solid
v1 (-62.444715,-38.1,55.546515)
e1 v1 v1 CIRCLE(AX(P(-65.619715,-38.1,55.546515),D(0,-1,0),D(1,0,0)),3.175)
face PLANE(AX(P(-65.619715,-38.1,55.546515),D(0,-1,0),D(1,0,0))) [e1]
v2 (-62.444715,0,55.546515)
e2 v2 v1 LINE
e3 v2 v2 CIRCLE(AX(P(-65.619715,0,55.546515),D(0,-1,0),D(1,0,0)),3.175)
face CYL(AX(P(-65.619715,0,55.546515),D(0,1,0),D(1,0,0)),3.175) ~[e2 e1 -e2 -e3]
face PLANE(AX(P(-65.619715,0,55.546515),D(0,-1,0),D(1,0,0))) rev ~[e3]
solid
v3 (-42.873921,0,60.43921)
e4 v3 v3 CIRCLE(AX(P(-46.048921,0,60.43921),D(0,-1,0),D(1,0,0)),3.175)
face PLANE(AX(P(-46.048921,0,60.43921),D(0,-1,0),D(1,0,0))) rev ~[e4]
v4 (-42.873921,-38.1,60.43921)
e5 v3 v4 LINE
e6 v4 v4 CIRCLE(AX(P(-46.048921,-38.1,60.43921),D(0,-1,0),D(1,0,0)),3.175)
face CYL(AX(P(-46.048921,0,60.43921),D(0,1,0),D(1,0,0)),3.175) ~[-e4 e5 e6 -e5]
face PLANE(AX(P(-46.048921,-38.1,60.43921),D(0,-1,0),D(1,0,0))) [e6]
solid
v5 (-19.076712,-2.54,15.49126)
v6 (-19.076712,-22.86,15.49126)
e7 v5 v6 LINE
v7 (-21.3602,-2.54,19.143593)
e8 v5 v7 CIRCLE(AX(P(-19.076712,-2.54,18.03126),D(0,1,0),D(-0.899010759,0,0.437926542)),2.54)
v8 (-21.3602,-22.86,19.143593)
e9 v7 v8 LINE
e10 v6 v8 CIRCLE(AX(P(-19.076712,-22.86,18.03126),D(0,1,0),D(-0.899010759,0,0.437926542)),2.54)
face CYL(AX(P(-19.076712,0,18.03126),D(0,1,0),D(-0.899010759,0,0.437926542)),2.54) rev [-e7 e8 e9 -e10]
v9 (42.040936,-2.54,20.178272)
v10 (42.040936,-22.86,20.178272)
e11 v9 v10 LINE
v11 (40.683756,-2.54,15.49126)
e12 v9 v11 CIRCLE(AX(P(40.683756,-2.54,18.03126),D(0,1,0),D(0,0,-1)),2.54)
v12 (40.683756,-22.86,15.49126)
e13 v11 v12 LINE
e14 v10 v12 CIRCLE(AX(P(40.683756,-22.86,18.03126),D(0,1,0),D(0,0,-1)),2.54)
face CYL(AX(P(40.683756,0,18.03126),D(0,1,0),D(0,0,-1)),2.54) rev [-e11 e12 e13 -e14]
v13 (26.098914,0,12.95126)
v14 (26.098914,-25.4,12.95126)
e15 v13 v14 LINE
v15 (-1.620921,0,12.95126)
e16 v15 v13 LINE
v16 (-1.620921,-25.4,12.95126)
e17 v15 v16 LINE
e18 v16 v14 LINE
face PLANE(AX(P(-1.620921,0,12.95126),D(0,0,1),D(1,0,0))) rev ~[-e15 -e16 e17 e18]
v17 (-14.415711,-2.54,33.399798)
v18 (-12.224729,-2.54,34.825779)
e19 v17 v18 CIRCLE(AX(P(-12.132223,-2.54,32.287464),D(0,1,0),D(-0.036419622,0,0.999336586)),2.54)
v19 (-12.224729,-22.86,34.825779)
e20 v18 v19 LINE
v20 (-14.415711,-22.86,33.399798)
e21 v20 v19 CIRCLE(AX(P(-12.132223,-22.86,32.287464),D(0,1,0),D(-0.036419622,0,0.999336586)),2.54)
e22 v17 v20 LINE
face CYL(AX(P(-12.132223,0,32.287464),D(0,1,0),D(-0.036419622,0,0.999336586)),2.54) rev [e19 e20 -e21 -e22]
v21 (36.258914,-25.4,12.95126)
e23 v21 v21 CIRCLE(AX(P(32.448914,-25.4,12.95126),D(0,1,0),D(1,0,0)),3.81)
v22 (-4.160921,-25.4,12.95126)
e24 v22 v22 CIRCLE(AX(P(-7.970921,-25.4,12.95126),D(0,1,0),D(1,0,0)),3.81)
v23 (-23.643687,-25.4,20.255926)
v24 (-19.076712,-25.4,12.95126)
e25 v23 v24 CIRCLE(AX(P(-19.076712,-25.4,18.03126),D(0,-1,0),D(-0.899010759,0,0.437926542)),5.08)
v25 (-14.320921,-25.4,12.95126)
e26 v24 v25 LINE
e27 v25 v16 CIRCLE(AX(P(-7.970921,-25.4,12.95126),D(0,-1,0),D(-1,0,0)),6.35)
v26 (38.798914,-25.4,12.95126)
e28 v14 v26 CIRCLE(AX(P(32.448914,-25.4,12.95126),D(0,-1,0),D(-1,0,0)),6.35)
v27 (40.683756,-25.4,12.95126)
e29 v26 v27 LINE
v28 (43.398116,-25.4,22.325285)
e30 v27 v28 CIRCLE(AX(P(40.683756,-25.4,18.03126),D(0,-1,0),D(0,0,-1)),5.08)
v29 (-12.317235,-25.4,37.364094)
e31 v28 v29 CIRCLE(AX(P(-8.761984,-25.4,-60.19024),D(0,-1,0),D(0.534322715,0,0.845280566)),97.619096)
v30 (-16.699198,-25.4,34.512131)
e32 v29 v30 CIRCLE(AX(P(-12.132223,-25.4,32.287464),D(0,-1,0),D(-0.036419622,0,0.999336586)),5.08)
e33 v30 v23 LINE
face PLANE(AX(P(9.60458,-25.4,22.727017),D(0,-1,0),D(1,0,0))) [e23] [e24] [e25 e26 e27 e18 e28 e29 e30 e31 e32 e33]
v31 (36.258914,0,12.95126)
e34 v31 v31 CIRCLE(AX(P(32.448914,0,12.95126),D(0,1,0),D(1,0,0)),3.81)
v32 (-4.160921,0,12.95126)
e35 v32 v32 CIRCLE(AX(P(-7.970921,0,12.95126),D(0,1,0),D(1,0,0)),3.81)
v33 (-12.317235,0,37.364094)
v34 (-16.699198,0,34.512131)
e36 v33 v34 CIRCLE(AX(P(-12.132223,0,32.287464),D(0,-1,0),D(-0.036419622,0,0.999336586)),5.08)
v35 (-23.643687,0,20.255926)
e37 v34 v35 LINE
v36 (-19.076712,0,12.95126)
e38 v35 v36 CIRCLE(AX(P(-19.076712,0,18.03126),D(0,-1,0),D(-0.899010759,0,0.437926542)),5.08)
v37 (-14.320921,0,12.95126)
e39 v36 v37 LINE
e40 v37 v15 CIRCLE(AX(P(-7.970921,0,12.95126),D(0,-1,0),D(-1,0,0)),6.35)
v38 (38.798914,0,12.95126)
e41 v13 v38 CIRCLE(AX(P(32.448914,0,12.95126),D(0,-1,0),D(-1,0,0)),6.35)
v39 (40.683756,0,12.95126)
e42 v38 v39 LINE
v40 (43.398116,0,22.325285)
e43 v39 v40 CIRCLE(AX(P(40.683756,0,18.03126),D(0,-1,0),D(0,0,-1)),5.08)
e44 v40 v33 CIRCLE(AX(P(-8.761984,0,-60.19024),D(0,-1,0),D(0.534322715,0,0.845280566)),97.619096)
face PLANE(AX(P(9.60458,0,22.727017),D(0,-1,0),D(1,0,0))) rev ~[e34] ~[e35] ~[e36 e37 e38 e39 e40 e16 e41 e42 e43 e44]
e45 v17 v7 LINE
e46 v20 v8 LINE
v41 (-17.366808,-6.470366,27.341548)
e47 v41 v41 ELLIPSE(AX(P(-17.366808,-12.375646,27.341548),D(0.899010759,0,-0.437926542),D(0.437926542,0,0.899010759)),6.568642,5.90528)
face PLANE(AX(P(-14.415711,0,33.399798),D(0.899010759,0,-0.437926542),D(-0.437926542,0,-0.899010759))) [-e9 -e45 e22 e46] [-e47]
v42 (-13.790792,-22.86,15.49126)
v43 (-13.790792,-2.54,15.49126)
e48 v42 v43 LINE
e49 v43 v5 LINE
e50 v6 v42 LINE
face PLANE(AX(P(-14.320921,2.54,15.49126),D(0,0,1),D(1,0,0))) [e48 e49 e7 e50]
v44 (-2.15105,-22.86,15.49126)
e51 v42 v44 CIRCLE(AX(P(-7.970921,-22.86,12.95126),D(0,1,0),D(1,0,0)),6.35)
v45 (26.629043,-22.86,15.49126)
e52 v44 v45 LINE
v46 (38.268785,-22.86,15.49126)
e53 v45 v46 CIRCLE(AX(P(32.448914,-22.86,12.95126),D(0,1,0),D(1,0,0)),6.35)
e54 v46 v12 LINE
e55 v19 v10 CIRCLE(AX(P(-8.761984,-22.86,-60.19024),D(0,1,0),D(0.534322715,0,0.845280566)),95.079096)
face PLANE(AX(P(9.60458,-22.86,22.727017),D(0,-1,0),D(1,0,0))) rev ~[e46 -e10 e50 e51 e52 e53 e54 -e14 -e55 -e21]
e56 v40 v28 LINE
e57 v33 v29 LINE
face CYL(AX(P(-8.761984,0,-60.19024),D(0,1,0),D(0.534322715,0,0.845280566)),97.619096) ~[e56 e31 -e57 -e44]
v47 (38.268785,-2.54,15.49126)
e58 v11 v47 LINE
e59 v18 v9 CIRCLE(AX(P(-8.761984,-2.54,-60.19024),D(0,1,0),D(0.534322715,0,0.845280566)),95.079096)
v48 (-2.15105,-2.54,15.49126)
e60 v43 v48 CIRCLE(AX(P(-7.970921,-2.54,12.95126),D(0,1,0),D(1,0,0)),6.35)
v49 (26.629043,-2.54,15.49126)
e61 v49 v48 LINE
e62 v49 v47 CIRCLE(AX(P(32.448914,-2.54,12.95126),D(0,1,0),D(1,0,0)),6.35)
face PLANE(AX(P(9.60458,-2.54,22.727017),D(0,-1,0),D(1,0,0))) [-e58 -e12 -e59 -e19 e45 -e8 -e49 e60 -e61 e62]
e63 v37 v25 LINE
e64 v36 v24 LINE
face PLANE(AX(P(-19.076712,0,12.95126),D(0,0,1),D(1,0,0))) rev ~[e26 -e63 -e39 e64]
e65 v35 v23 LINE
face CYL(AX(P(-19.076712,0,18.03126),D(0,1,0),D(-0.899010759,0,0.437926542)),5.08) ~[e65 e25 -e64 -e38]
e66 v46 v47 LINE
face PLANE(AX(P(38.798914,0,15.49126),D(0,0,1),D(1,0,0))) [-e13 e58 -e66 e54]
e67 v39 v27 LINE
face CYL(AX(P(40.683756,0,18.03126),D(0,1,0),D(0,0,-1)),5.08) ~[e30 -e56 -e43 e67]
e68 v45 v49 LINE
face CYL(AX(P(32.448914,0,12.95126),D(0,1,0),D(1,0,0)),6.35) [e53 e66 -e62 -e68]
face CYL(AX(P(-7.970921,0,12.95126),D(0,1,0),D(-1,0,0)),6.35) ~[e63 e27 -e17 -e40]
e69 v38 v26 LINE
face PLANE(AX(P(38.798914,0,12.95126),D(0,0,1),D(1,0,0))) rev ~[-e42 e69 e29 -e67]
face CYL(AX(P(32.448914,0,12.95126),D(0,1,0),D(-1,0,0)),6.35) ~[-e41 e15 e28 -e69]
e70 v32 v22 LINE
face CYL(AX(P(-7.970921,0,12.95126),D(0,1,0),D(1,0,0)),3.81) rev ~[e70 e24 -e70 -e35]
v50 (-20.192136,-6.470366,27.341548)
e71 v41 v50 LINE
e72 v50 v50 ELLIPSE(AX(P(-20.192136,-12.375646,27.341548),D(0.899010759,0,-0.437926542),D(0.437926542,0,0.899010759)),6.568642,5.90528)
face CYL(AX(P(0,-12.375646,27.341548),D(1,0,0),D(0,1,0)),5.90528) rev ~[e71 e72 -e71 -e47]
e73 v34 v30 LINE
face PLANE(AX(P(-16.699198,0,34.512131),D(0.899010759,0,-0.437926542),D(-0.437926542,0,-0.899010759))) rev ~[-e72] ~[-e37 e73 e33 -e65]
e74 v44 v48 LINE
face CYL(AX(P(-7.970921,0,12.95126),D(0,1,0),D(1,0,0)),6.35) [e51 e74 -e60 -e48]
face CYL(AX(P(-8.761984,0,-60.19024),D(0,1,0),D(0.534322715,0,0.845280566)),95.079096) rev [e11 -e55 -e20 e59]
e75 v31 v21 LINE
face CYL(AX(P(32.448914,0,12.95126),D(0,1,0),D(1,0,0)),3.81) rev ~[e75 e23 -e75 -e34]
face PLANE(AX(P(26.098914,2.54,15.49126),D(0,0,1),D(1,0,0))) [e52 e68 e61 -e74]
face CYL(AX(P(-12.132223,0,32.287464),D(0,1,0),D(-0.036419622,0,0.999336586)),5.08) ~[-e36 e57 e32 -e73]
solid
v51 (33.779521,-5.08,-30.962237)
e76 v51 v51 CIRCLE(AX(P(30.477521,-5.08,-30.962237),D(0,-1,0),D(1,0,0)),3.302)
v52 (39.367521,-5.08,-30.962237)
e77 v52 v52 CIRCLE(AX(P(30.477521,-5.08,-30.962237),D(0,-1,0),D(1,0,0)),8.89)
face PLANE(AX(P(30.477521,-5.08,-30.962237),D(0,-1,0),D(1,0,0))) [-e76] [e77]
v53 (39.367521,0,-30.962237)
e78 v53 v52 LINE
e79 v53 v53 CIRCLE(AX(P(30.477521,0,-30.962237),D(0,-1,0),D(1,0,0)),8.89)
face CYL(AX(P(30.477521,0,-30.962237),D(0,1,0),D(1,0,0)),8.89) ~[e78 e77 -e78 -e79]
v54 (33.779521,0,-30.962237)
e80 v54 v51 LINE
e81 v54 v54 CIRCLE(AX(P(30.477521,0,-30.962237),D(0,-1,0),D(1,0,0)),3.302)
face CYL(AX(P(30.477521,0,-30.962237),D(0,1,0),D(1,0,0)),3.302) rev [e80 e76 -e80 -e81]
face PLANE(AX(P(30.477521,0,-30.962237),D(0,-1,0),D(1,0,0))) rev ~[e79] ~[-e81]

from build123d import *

# Parameters (mm, degrees)
F1_DEPTH    = 25.4
F2_T        = 2.54
F2_T3_DEPTH = 30.48
F3_R        = 12.5715428013
F4_DEPTH    = 25.4
F5_R        = 3.175
F6_DEPTH    = 38.1
F8_R        = 8.89
F8_R_2      = 3.302
F9_DEPTH    = 5.08
F10_R       = 5.9052801824
F11_DEPTH   = 29.464


# Not quite as in the source:
# - a shell that OpenCascade refuses in one call is made with other operations: the cavity is built on its own and cut out


with BuildPart() as f1:
    # F0 (on Front) → F1 (new body)
    with BuildSketch(Plane.XZ):
        with BuildLine():
            ThreePointArc((40.6837563911, 12.9512595013), (45.5633080309, 16.6183278701), (43.3981157839, 22.3252847791))
            ThreePointArc((43.3981157839, 22.3252847791), (16.6771448475, 34.0559195708), (-12.3172349893, 37.3640940343))
            ThreePointArc((-12.3172349893, 37.3640940343), (-14.9032820969, 36.5451200142), (-16.6991979645, 34.5121310115))
            Line((-16.6991979645, 34.5121310115), (-23.6436870624, 20.2559263329))
            ThreePointArc((-23.6436870624, 20.2559263329), (-23.3841308643, 15.3382043129), (-19.0767124086, 12.9512595013))
            Line((-19.0767124086, 12.9512595013), (-14.3209207639, 12.9512595013))
            ThreePointArc((-14.3209207639, 12.9512595013), (-7.9709207639, 19.3012595013), (-1.6209207639, 12.9512595013))
            Line((-1.6209207639, 12.9512595013), (26.098913902, 12.9512595013))
            ThreePointArc((26.098913902, 12.9512595013), (32.448913902, 19.3012595013), (38.798913902, 12.9512595013))
            Line((38.798913902, 12.9512595013), (40.6837563911, 12.9512595013))
        make_face()
        with BuildLine():
            ThreePointArc((26.098913902, 12.9512595013), (32.448913902, 6.6012595013), (38.798913902, 12.9512595013))
            Line((38.798913902, 12.9512595013), (36.258913902, 12.9512595013))
            ThreePointArc((36.258913902, 12.9512595013), (32.448913902, 9.1412595013), (28.638913902, 12.9512595013))
            Line((28.638913902, 12.9512595013), (26.098913902, 12.9512595013))
        make_face()
        with BuildLine():
            Line((36.258913902, 12.9512595013), (38.798913902, 12.9512595013))
            ThreePointArc((38.798913902, 12.9512595013), (32.448913902, 19.3012595013), (26.098913902, 12.9512595013))
            Line((26.098913902, 12.9512595013), (28.638913902, 12.9512595013))
            ThreePointArc((28.638913902, 12.9512595013), (32.448913902, 16.7612595013), (36.258913902, 12.9512595013))
        make_face()
        with BuildLine():
            ThreePointArc((-14.3209207639, 12.9512595013), (-7.9709207639, 6.6012595013), (-1.6209207639, 12.9512595013))
            Line((-1.6209207639, 12.9512595013), (-4.1609207639, 12.9512595013))
            ThreePointArc((-4.1609207639, 12.9512595013), (-7.9709207639, 9.1412595013), (-11.7809207639, 12.9512595013))
            Line((-11.7809207639, 12.9512595013), (-14.3209207639, 12.9512595013))
        make_face()
        with BuildLine():
            Line((-4.1609207639, 12.9512595013), (-1.6209207639, 12.9512595013))
            ThreePointArc((-1.6209207639, 12.9512595013), (-7.9709207639, 19.3012595013), (-14.3209207639, 12.9512595013))
            Line((-14.3209207639, 12.9512595013), (-11.7809207639, 12.9512595013))
            ThreePointArc((-11.7809207639, 12.9512595013), (-7.9709207639, 16.7612595013), (-4.1609207639, 12.9512595013))
        make_face()
    extrude(amount=F1_DEPTH)

    # F2: shell of thickness 2.54, made by hand


with BuildPart() as f2_core1:
    # F2_t2: copy of F1
    add(f1.part)

    # the walls: a layer under each face that stays
    f2_faces = [f2_core1.faces().sort_by_distance(p)[0] for p in [
        (45.5633080309, -12.7, 16.6183278701),
        (16.6771448475, -12.7, 34.0559195708),
        (-14.9032820969, -12.7, 36.5451200142),
        (-20.1714425135, -12.7, 27.3840286722),
        (-23.3841308643, -12.7, 15.3382043129),
        (-16.6988165863, -12.7, 12.9512595013),
        (-7.9709207639, -12.7, 6.6012595013),
        (12.2389965691, -12.7, 12.9512595013),
        (32.448913902, -12.7, 6.6012595013),
        (39.7413351466, -12.7, 12.9512595013),
        (28.638913902, -12.7, 12.9512595013),
        (-11.7809207639, -12.7, 12.9512595013),
        (10.8035219912, 0, 22.0150577288),
        (10.8035219912, -25.4, 22.0150577288),
    ]]
    thicken(f2_faces, amount=-F2_T, mode=Mode.SUBTRACT)

    # F2_s4 → F2_t3 (cut)
    with BuildSketch(Plane.XZ.offset(-2.54)):
        Polygon((-14.3463207639, 12.9258595013), (-14.3209207639, 15.4912595013), (-11.7809207639, 15.4912595013), (-11.7809207639, 12.9512595013), align=None)
        Polygon((-1.5955207639, 12.9258595013), (-4.1609207639, 12.9512595013), (-4.1609207639, 15.4912595013), (-1.6209207639, 15.4912595013), align=None)
        Polygon((26.073513902, 12.9258595013), (26.098913902, 15.4912595013), (28.638913902, 15.4912595013), (28.638913902, 12.9512595013), align=None)
        Polygon((38.824313902, 12.9258595013), (36.258913902, 12.9512595013), (36.258913902, 15.4912595013), (38.798913902, 15.4912595013), align=None)
    extrude(amount=F2_T3_DEPTH, mode=Mode.SUBTRACT)


with BuildPart() as f1_1:
    add(f1.part)

    # what is left inside the walls is the cavity
    f2_cavity = [f2_core1.part.solids().sort_by_distance(p)[0] for p in [
        (16.008612, -16.086667, 31.579159),
    ]]
    add(f2_cavity, mode=Mode.SUBTRACT)

    # F10 (on Right) → F11 (cut)
    with BuildSketch(Plane.YZ):
        with Locations((-12.3756462708, 27.3415483534)):
            Circle(F10_R)
    extrude(amount=-F11_DEPTH, mode=Mode.SUBTRACT)


with BuildPart() as f4:
    # F3 (on Front) → F4 (new body)
    with BuildSketch(Plane.XZ):
        with Locations((-40.8684164286, -40.0050021708)):
            Circle(F3_R)
    extrude(amount=F4_DEPTH)


with BuildPart() as f6:
    # F5 (on Front) → F6 (new body)
    with BuildSketch(Plane.XZ):
        with Locations((-65.6197145581, 55.5465146899)):
            Circle(F5_R)
    extrude(amount=F6_DEPTH)


with BuildPart() as f6b:
    # F5 (on Front) → F6, piece 2 (new body)
    with BuildSketch(Plane.XZ):
        with Locations((-46.0489206016, 60.4392103851)):
            Circle(F5_R)
    extrude(amount=F6_DEPTH)


with BuildPart() as f9:
    # F8 (on Front) → F9 (new body)
    with BuildSketch(Plane.XZ):
        with Locations((30.4775213926, -30.9622374706)):
            Circle(F8_R)
        with Locations((30.4775213926, -30.9622374706)):
            Circle(F8_R_2, mode=Mode.SUBTRACT)
    extrude(amount=F9_DEPTH)


solid = Compound([f1_1.part, f6.part, f6b.part, f9.part])
